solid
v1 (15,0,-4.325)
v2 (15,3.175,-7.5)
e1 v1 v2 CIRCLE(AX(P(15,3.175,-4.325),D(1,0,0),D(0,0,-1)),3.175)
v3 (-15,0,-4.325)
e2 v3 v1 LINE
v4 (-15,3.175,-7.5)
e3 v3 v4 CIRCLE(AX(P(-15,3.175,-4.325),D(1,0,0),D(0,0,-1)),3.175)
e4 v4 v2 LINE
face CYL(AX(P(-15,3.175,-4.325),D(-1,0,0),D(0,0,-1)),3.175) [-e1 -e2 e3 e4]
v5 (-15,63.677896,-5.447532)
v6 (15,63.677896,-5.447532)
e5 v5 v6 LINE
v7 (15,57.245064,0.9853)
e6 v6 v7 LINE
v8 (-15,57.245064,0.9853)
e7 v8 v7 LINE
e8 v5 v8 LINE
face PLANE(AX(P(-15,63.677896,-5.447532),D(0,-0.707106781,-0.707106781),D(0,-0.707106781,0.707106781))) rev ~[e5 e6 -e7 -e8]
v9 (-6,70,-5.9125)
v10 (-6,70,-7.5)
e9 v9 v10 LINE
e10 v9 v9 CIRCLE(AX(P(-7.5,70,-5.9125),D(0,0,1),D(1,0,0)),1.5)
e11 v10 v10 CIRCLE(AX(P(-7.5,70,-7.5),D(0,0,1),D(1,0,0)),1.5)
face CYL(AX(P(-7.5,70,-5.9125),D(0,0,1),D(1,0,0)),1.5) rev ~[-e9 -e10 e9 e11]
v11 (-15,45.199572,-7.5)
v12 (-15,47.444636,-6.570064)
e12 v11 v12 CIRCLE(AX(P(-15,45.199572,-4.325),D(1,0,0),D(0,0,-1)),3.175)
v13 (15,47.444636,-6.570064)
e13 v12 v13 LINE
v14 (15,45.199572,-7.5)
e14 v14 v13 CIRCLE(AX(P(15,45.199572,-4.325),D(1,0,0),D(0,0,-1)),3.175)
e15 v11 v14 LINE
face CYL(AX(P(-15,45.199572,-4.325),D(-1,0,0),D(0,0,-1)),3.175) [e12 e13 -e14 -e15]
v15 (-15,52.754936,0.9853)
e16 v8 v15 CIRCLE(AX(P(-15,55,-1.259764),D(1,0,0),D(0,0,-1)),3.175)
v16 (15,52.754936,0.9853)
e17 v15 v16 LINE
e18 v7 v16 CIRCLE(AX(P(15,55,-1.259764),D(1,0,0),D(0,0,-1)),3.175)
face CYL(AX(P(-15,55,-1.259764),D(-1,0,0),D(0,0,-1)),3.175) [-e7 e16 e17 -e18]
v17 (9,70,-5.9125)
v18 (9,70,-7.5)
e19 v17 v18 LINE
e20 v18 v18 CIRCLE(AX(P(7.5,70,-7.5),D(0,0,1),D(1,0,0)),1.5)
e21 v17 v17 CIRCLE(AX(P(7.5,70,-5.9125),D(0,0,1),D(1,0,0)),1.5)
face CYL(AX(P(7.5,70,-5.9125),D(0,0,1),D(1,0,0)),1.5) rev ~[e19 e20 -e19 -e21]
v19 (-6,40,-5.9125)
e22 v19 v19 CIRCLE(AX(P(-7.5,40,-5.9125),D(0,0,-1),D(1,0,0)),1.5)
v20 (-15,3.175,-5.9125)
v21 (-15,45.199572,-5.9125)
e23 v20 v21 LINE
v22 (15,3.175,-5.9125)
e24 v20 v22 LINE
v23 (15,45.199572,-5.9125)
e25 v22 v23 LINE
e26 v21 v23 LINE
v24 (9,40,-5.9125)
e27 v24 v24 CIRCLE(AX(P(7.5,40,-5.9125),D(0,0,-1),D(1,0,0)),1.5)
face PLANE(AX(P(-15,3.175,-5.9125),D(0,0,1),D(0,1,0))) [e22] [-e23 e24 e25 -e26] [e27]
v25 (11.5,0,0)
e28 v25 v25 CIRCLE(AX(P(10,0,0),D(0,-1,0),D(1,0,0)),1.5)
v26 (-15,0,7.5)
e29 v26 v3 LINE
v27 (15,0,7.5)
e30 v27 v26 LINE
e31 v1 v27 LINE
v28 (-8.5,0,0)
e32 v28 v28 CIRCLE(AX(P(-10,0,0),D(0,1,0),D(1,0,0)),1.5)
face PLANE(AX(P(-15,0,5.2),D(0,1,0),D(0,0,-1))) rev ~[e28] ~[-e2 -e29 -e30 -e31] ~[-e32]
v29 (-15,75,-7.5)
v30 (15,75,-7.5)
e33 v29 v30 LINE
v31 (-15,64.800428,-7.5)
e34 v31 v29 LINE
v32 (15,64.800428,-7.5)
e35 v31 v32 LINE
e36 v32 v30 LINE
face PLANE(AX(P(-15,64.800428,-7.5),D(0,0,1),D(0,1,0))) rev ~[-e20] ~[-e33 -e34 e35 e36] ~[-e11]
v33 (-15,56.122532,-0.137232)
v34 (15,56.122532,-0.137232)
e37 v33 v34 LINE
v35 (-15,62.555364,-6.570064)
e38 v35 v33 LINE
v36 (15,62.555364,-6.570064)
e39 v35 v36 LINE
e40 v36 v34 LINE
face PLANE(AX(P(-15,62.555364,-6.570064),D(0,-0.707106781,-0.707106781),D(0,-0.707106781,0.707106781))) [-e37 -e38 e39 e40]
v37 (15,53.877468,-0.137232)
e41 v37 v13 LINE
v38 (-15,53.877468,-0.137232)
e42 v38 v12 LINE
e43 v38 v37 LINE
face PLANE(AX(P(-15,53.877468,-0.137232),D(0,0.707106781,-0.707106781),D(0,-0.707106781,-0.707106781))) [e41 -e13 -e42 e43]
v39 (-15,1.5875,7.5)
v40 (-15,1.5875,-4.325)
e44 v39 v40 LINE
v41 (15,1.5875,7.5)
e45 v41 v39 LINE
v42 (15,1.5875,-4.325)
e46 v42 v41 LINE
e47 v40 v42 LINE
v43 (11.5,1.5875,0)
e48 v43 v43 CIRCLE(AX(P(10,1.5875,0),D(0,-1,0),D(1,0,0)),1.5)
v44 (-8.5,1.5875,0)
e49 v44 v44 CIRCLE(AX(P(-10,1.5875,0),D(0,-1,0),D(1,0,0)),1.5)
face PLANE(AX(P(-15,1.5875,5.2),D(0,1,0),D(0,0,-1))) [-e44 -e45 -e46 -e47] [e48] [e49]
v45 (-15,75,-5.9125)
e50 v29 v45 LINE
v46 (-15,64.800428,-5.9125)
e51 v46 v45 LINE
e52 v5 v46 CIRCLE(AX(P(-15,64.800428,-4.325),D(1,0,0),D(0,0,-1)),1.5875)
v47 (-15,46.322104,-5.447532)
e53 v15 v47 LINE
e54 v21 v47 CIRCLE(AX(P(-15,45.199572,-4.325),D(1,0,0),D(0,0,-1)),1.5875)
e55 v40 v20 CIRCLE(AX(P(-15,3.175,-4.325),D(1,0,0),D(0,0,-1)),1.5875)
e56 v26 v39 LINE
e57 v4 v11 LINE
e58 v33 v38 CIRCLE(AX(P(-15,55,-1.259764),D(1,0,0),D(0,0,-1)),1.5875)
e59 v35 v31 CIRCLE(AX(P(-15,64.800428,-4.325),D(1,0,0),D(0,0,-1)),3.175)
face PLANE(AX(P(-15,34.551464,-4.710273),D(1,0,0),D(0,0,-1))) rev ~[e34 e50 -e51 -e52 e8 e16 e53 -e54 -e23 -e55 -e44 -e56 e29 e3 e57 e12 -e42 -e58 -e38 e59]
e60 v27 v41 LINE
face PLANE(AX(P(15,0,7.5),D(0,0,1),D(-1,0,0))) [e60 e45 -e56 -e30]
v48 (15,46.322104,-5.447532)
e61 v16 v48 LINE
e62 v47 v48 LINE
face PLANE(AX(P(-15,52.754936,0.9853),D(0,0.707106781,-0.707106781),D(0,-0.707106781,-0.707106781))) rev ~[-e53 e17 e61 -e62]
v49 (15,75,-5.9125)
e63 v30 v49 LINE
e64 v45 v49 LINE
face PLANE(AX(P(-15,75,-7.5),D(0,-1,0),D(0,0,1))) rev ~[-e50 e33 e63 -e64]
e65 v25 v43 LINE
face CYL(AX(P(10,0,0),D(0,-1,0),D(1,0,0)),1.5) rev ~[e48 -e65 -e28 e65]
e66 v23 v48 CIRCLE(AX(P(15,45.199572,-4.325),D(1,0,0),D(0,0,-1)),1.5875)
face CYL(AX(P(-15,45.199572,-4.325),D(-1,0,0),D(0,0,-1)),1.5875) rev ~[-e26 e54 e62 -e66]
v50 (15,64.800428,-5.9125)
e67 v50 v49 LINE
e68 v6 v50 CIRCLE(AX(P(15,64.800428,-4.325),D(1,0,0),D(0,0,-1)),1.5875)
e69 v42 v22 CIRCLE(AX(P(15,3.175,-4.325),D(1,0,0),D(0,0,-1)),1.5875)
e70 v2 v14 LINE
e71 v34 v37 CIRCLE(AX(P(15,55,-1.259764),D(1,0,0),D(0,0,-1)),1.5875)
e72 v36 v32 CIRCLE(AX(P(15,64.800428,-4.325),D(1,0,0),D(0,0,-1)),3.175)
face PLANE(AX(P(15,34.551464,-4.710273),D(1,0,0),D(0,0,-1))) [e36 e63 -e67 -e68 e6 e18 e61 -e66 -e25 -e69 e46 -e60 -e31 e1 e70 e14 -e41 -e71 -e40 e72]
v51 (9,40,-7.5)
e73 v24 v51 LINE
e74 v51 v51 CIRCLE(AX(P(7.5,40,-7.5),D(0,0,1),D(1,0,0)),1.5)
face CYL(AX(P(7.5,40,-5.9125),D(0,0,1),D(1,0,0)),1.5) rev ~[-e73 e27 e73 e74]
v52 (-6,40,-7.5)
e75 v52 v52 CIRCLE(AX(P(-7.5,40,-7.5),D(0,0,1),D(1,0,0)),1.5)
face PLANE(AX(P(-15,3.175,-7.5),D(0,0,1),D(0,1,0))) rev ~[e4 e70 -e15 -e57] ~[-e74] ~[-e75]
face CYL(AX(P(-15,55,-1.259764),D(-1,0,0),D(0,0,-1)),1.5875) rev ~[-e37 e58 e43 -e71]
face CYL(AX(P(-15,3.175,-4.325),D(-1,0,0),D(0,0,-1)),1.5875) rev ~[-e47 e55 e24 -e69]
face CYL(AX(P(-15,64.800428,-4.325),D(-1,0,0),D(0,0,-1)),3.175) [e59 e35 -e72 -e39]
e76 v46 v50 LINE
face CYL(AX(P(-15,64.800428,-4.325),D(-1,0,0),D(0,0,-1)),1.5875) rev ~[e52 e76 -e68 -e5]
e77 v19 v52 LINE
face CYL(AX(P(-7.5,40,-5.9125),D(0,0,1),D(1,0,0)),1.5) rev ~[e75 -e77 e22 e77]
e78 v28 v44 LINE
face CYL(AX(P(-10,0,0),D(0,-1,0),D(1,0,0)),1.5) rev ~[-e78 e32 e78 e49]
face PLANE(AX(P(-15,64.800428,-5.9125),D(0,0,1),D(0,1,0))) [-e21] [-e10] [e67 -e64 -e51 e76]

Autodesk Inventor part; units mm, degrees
ref_plane "YZ Plane" through (0, 0, 0) normal (1, 0, 0) x (0, 1, 0)
ref_plane "XZ Plane" through (0, 0, 0) normal (0, 1, 0) x (-1, 0, 0)
ref_plane "XY Plane" through (0, 0, 0) normal (0, 0, 1) x (1, 0, 0)
sketch "Sketch1" plane through (0, 0, 0) normal (0, 1, 0) x (-1, 0, 0)
  line L0 (15, -7.5) -> (-15, -7.5)
  line L1 (-15, -7.5) -> (-15, 7.5)
  line L2 (-15, 7.5) -> (15, 7.5)
  line L3 (15, 7.5) -> (15, -7.5)
  line L4 (15, -7.5) -> (-15, 7.5) construction
  line L5 (-15, -7.5) -> (15, 7.5) construction
  point P0 (0, 0)
  dimension "d10" = 30
  dimension "d11" = 15
extrude "Plate1" add sketch "Sketch1" along normal blind 1.5875
sketch "Sketch3" plane through (15, 0, 7.5) normal (1, 0, 0) x (0, 0, -1)
  line L0 (15, 0) -> (15, 1.5875)
  line L1 (15, 0) -> (15, 46.5147)
  line L2 (15, 0) -> (0, 0)
  line L3 (15, 63.4853) -> (15, 75)
  line L4 (6.5147, 55) -> (15, 46.5147)
  line L5 (15, 63.4853) -> (6.5147, 55)
  point P0 (7.5, 0)
  point P1 (15, 55)
  dimension "d48" = 75
  dimension "d91" = 55
  dimension "d92" = 0
  dimension "d94" = 90
  dimension "d95" = 135
  dimension "d96" = 6
  dimension "d97" = 6
contour flange "Contour Flange4" sketch "Sketch3" thickness 1.5875 bend radius 1.5875 curves L1 L4 L5 L3 edges at (0, 1.5875, -7.5) running between points at (15, 1.5875, -7.5) (-15, 1.5875, -7.5)
bend "Bend4"
corner "Corner4"
sketch "Sketch4" plane through (-15, 75, -5.9125) normal (0, 0, 1) x (1, 0, 0)
  line L0 (0, -10.1996) -> (30, -10.1996) projected
  line L1 (30, 0) -> (0, 0) projected
  line L2 (0, 0) -> (0, -10.1996) projected
  circle A0 centre (7.5, -5) radius 1.5
  line L3 (15, 0) -> (15, -10.1996)
  circle A1 centre (22.5, -5) radius 1.5
  point P0 (15, -75)
  dimension "d50" = 3
  dimension "d52" = 5
  dimension "d53" = 7.5
extrude "Cut1" cut sketch "Sketch4" against normal blind 1.5875 contours A0 | A1
sketch "Sketch9" plane through (-15, 45.1996, -5.9125) normal (0, 0, 1) x (1, 0, 0)
  line L0 (0, 0) -> (30, 0) projected
  line L1 (0, 0) -> (0, -42.0246) projected
  line L2 (0, -42.0246) -> (30, -42.0246) projected
  line L3 (30, 0) -> (30, -42.0246) projected
  circle A0 centre (7.5, -5.1996) radius 1.5
  line L4 (15, -42.0246) -> (15, 0)
  line L5 (0, -5.1996) -> (30, -5.1996)
  circle A1 centre (22.5, -5.1996) radius 1.5
  circle A2 centre (22.5, 24.8004) radius 1.5 projected
  point P0 (15, -45.1996)
  dimension "d79" = 3
  dimension "d81" = 7.5
  dimension "d84" = 30
extrude "Cut4" cut sketch "Sketch9" against normal blind 1.5875 contours L5 A0 | A0 L5 | A1 L5 | L5 A1
sketch "Sketch8" plane through (0, 0, 0) normal (0, -1, 0) x (1, 0, 0)
  line L0 (0, 0) -> (-15, 0)
  line L1 (-15, 0) -> (-15, 7.5)
  line L2 (-15, 7.5) -> (0, 7.5)
  line L3 (0, 7.5) -> (0, 0)
  circle A0 centre (-10, 0) radius 1.5
  circle A1 centre (10, 0) radius 1.5
  dimension "d75" = 3
  dimension "d76" = 5
extrude "Cut3" cut sketch "Sketch8" against normal blind 1.5875 contours A0 L0 | L0 A0 | A1
equation "\"d10\" = laser_x"
equation "\"d11\" = laser_y"
equation "\"d48\" = laser_z"
equation "\"d50\" = m3_diameter"
equation "\"d53\" = 0.25 * laser_x"
equation "\"d54\" = Thickness"
equation "\"d79\" = m3_diameter"
equation "\"d81\" = 0.25 * laser_x"
equation "\"d82\" = Thickness"
equation "\"d75\" = m3_diameter"
equation "\"d76\" = 0.166667 * laser_x"
equation "\"d77\" = Thickness"
equation "\"Thickness\" = sm_thickness"
equation "\"d36\" = BendReliefWidth"
equation "\"d37\" = BendReliefDepth"
equation "\"d38\" = MinimumRemnant"
equation "\"d39\" = BendRadius"
equation "\"d40\" = BendRadius"
equation "\"d42\" = CornerReliefSize"
equation "\"d43\" = GapSize"
equation "\"d44\" = JacobiRadiusSize"
equation "\"BendRadius\" = Thickness"
equation "\"BendReliefWidth\" = Thickness"
equation "\"BendReliefDepth\" = 0.5 * Thickness"
equation "\"CornerReliefSize\" = 4 * Thickness"
equation "\"MinimumRemnant\" = 2 * Thickness"
equation "\"TransitionRadius\" = BendRadius"
equation "\"JacobiRadiusSize\" = BendRadius"
equation "\"GapSize\" = Thickness"
equation "\"d0\" = BendRadius"
equation "\"sm_thickness\" = 1.5875"
equation "\"very_thick_acrylic\" = 9.45"
equation "\"thick_acrylic\" = 5.88"
equation "\"thin_acrylic\" = 3.15"
equation "\"clear_acrylic\" = 3.15"
equation "\"wood_thickness\" = 6.72"
equation "\"m3_diameter\" = 3"
equation "\"m3_head\" = 6"
equation "\"m4_diameter\" = 4"
equation "\"m5_diameter\" = 5"
equation "\"m5_head\" = 10.3"
equation "\"brass_insert_drill\" = 4"
equation "\"m5_brass_insert_drill\" = 6.7"
equation "\"m3_press_nut_drill\" = 4.5"
equation "\"m5_press_nut_drill\" = 6.5"
equation "\"stepper_screw_space\" = 35"
equation "\"stepper_shaft_diameter\" = 5"
equation "\"stepper_body_diameter\" = 28"
equation "\"laser_body_diameter\" = 12"
equation "\"carrier_y\" = 251"
equation "\"carrier_z\" = 12"
equation "\"visor_x\" = 253.925"
equation "\"visor_y\" = 85.6"
equation "\"window_z\" = 332.225"
equation "\"window_y\" = 93.75"
equation "\"window_overlap\" = 48"
equation "\"acrylic_into_frame\" = 5"
equation "\"door_x\" = 251"
equation "\"door_z\" = 332.225"
equation "\"door_overlap\" = 48"
equation "\"reservoir_x\" = 201"
equation "\"reservoir_y\" = 201"
equation "\"linear_bearing_spacing\" = 271"
equation "\"tray_border\" = 25"
equation "\"tray_x\" = 251"
equation "\"tray_y\" = 251"
equation "\"bed_z\" = 25"
equation "\"crane_z2\" = 12"
equation "\"end_stop_spacing\" = 19"
equation "\"thumb_nut_offset_y\" = 0"
equation "\"thumb_nut_diameter\" = 7"
equation "\"z_min_from_center\" = 115"
equation "\"frame_top_z\" = 385"
equation "\"frame_bottom_z\" = 275"
equation "\"frame_total_z\" = 661.5875"
equation "\"frame_border\" = 48.0375"
equation "\"frame_foot_z\" = 12"
equation "\"frame_tilt\" = 1deg"
equation "\"subframe_x\" = 66"
equation "\"subframe_y_offset\" = 27.5"
equation "\"laser_y_offset\" = 19.4"
equation "\"laser_diameter\" = 12"
equation "\"laser_z_offset\" = 55"
equation "\"laser_y\" = 15"
equation "\"laser_z\" = 75"
equation "\"laser_x\" = 30"
equation "\"t_galvo_frame\" = 6.72"
equation "\"galvo_frame_x\" = 66"
equation "\"galvo_frame_z\" = 85"
equation "\"galvo_frame_y_offset\" = 27.5"
equation "\"drawer_x\" = 257.3"
equation "\"drawer_y\" = 90.3375"
equation "\"drawer_z\" = 278.175"
equation "\"drawer_support_from_top\" = 48"
equation "\"nema17_x\" = 43"
equation "\"laser_gap\" = 1"
equation "\"frame_screw_from_center\" = 25"
equation "\"drawer_screw_from_center\" = 55"
equation "\"frame_face_y\" = 45"
equation "\"switch_spacing\" = 19"
equation "\"subframe_y\" = 55"
equation "\"al_thickness\" = 1.5875"
equation "\"rivet_diameter\" = 3.3"
equation "\"bend_factor\" = 2.26205"
equation "\"al_bend\" = 3.591"
equation "\"sm_bend\" = 3.591"
equation "\"frame_x\" = 353.375"
equation "\"carrier_z2\" = 25"
equation "\"carrier_y2\" = 76.825"
properties part number "laserholder"
